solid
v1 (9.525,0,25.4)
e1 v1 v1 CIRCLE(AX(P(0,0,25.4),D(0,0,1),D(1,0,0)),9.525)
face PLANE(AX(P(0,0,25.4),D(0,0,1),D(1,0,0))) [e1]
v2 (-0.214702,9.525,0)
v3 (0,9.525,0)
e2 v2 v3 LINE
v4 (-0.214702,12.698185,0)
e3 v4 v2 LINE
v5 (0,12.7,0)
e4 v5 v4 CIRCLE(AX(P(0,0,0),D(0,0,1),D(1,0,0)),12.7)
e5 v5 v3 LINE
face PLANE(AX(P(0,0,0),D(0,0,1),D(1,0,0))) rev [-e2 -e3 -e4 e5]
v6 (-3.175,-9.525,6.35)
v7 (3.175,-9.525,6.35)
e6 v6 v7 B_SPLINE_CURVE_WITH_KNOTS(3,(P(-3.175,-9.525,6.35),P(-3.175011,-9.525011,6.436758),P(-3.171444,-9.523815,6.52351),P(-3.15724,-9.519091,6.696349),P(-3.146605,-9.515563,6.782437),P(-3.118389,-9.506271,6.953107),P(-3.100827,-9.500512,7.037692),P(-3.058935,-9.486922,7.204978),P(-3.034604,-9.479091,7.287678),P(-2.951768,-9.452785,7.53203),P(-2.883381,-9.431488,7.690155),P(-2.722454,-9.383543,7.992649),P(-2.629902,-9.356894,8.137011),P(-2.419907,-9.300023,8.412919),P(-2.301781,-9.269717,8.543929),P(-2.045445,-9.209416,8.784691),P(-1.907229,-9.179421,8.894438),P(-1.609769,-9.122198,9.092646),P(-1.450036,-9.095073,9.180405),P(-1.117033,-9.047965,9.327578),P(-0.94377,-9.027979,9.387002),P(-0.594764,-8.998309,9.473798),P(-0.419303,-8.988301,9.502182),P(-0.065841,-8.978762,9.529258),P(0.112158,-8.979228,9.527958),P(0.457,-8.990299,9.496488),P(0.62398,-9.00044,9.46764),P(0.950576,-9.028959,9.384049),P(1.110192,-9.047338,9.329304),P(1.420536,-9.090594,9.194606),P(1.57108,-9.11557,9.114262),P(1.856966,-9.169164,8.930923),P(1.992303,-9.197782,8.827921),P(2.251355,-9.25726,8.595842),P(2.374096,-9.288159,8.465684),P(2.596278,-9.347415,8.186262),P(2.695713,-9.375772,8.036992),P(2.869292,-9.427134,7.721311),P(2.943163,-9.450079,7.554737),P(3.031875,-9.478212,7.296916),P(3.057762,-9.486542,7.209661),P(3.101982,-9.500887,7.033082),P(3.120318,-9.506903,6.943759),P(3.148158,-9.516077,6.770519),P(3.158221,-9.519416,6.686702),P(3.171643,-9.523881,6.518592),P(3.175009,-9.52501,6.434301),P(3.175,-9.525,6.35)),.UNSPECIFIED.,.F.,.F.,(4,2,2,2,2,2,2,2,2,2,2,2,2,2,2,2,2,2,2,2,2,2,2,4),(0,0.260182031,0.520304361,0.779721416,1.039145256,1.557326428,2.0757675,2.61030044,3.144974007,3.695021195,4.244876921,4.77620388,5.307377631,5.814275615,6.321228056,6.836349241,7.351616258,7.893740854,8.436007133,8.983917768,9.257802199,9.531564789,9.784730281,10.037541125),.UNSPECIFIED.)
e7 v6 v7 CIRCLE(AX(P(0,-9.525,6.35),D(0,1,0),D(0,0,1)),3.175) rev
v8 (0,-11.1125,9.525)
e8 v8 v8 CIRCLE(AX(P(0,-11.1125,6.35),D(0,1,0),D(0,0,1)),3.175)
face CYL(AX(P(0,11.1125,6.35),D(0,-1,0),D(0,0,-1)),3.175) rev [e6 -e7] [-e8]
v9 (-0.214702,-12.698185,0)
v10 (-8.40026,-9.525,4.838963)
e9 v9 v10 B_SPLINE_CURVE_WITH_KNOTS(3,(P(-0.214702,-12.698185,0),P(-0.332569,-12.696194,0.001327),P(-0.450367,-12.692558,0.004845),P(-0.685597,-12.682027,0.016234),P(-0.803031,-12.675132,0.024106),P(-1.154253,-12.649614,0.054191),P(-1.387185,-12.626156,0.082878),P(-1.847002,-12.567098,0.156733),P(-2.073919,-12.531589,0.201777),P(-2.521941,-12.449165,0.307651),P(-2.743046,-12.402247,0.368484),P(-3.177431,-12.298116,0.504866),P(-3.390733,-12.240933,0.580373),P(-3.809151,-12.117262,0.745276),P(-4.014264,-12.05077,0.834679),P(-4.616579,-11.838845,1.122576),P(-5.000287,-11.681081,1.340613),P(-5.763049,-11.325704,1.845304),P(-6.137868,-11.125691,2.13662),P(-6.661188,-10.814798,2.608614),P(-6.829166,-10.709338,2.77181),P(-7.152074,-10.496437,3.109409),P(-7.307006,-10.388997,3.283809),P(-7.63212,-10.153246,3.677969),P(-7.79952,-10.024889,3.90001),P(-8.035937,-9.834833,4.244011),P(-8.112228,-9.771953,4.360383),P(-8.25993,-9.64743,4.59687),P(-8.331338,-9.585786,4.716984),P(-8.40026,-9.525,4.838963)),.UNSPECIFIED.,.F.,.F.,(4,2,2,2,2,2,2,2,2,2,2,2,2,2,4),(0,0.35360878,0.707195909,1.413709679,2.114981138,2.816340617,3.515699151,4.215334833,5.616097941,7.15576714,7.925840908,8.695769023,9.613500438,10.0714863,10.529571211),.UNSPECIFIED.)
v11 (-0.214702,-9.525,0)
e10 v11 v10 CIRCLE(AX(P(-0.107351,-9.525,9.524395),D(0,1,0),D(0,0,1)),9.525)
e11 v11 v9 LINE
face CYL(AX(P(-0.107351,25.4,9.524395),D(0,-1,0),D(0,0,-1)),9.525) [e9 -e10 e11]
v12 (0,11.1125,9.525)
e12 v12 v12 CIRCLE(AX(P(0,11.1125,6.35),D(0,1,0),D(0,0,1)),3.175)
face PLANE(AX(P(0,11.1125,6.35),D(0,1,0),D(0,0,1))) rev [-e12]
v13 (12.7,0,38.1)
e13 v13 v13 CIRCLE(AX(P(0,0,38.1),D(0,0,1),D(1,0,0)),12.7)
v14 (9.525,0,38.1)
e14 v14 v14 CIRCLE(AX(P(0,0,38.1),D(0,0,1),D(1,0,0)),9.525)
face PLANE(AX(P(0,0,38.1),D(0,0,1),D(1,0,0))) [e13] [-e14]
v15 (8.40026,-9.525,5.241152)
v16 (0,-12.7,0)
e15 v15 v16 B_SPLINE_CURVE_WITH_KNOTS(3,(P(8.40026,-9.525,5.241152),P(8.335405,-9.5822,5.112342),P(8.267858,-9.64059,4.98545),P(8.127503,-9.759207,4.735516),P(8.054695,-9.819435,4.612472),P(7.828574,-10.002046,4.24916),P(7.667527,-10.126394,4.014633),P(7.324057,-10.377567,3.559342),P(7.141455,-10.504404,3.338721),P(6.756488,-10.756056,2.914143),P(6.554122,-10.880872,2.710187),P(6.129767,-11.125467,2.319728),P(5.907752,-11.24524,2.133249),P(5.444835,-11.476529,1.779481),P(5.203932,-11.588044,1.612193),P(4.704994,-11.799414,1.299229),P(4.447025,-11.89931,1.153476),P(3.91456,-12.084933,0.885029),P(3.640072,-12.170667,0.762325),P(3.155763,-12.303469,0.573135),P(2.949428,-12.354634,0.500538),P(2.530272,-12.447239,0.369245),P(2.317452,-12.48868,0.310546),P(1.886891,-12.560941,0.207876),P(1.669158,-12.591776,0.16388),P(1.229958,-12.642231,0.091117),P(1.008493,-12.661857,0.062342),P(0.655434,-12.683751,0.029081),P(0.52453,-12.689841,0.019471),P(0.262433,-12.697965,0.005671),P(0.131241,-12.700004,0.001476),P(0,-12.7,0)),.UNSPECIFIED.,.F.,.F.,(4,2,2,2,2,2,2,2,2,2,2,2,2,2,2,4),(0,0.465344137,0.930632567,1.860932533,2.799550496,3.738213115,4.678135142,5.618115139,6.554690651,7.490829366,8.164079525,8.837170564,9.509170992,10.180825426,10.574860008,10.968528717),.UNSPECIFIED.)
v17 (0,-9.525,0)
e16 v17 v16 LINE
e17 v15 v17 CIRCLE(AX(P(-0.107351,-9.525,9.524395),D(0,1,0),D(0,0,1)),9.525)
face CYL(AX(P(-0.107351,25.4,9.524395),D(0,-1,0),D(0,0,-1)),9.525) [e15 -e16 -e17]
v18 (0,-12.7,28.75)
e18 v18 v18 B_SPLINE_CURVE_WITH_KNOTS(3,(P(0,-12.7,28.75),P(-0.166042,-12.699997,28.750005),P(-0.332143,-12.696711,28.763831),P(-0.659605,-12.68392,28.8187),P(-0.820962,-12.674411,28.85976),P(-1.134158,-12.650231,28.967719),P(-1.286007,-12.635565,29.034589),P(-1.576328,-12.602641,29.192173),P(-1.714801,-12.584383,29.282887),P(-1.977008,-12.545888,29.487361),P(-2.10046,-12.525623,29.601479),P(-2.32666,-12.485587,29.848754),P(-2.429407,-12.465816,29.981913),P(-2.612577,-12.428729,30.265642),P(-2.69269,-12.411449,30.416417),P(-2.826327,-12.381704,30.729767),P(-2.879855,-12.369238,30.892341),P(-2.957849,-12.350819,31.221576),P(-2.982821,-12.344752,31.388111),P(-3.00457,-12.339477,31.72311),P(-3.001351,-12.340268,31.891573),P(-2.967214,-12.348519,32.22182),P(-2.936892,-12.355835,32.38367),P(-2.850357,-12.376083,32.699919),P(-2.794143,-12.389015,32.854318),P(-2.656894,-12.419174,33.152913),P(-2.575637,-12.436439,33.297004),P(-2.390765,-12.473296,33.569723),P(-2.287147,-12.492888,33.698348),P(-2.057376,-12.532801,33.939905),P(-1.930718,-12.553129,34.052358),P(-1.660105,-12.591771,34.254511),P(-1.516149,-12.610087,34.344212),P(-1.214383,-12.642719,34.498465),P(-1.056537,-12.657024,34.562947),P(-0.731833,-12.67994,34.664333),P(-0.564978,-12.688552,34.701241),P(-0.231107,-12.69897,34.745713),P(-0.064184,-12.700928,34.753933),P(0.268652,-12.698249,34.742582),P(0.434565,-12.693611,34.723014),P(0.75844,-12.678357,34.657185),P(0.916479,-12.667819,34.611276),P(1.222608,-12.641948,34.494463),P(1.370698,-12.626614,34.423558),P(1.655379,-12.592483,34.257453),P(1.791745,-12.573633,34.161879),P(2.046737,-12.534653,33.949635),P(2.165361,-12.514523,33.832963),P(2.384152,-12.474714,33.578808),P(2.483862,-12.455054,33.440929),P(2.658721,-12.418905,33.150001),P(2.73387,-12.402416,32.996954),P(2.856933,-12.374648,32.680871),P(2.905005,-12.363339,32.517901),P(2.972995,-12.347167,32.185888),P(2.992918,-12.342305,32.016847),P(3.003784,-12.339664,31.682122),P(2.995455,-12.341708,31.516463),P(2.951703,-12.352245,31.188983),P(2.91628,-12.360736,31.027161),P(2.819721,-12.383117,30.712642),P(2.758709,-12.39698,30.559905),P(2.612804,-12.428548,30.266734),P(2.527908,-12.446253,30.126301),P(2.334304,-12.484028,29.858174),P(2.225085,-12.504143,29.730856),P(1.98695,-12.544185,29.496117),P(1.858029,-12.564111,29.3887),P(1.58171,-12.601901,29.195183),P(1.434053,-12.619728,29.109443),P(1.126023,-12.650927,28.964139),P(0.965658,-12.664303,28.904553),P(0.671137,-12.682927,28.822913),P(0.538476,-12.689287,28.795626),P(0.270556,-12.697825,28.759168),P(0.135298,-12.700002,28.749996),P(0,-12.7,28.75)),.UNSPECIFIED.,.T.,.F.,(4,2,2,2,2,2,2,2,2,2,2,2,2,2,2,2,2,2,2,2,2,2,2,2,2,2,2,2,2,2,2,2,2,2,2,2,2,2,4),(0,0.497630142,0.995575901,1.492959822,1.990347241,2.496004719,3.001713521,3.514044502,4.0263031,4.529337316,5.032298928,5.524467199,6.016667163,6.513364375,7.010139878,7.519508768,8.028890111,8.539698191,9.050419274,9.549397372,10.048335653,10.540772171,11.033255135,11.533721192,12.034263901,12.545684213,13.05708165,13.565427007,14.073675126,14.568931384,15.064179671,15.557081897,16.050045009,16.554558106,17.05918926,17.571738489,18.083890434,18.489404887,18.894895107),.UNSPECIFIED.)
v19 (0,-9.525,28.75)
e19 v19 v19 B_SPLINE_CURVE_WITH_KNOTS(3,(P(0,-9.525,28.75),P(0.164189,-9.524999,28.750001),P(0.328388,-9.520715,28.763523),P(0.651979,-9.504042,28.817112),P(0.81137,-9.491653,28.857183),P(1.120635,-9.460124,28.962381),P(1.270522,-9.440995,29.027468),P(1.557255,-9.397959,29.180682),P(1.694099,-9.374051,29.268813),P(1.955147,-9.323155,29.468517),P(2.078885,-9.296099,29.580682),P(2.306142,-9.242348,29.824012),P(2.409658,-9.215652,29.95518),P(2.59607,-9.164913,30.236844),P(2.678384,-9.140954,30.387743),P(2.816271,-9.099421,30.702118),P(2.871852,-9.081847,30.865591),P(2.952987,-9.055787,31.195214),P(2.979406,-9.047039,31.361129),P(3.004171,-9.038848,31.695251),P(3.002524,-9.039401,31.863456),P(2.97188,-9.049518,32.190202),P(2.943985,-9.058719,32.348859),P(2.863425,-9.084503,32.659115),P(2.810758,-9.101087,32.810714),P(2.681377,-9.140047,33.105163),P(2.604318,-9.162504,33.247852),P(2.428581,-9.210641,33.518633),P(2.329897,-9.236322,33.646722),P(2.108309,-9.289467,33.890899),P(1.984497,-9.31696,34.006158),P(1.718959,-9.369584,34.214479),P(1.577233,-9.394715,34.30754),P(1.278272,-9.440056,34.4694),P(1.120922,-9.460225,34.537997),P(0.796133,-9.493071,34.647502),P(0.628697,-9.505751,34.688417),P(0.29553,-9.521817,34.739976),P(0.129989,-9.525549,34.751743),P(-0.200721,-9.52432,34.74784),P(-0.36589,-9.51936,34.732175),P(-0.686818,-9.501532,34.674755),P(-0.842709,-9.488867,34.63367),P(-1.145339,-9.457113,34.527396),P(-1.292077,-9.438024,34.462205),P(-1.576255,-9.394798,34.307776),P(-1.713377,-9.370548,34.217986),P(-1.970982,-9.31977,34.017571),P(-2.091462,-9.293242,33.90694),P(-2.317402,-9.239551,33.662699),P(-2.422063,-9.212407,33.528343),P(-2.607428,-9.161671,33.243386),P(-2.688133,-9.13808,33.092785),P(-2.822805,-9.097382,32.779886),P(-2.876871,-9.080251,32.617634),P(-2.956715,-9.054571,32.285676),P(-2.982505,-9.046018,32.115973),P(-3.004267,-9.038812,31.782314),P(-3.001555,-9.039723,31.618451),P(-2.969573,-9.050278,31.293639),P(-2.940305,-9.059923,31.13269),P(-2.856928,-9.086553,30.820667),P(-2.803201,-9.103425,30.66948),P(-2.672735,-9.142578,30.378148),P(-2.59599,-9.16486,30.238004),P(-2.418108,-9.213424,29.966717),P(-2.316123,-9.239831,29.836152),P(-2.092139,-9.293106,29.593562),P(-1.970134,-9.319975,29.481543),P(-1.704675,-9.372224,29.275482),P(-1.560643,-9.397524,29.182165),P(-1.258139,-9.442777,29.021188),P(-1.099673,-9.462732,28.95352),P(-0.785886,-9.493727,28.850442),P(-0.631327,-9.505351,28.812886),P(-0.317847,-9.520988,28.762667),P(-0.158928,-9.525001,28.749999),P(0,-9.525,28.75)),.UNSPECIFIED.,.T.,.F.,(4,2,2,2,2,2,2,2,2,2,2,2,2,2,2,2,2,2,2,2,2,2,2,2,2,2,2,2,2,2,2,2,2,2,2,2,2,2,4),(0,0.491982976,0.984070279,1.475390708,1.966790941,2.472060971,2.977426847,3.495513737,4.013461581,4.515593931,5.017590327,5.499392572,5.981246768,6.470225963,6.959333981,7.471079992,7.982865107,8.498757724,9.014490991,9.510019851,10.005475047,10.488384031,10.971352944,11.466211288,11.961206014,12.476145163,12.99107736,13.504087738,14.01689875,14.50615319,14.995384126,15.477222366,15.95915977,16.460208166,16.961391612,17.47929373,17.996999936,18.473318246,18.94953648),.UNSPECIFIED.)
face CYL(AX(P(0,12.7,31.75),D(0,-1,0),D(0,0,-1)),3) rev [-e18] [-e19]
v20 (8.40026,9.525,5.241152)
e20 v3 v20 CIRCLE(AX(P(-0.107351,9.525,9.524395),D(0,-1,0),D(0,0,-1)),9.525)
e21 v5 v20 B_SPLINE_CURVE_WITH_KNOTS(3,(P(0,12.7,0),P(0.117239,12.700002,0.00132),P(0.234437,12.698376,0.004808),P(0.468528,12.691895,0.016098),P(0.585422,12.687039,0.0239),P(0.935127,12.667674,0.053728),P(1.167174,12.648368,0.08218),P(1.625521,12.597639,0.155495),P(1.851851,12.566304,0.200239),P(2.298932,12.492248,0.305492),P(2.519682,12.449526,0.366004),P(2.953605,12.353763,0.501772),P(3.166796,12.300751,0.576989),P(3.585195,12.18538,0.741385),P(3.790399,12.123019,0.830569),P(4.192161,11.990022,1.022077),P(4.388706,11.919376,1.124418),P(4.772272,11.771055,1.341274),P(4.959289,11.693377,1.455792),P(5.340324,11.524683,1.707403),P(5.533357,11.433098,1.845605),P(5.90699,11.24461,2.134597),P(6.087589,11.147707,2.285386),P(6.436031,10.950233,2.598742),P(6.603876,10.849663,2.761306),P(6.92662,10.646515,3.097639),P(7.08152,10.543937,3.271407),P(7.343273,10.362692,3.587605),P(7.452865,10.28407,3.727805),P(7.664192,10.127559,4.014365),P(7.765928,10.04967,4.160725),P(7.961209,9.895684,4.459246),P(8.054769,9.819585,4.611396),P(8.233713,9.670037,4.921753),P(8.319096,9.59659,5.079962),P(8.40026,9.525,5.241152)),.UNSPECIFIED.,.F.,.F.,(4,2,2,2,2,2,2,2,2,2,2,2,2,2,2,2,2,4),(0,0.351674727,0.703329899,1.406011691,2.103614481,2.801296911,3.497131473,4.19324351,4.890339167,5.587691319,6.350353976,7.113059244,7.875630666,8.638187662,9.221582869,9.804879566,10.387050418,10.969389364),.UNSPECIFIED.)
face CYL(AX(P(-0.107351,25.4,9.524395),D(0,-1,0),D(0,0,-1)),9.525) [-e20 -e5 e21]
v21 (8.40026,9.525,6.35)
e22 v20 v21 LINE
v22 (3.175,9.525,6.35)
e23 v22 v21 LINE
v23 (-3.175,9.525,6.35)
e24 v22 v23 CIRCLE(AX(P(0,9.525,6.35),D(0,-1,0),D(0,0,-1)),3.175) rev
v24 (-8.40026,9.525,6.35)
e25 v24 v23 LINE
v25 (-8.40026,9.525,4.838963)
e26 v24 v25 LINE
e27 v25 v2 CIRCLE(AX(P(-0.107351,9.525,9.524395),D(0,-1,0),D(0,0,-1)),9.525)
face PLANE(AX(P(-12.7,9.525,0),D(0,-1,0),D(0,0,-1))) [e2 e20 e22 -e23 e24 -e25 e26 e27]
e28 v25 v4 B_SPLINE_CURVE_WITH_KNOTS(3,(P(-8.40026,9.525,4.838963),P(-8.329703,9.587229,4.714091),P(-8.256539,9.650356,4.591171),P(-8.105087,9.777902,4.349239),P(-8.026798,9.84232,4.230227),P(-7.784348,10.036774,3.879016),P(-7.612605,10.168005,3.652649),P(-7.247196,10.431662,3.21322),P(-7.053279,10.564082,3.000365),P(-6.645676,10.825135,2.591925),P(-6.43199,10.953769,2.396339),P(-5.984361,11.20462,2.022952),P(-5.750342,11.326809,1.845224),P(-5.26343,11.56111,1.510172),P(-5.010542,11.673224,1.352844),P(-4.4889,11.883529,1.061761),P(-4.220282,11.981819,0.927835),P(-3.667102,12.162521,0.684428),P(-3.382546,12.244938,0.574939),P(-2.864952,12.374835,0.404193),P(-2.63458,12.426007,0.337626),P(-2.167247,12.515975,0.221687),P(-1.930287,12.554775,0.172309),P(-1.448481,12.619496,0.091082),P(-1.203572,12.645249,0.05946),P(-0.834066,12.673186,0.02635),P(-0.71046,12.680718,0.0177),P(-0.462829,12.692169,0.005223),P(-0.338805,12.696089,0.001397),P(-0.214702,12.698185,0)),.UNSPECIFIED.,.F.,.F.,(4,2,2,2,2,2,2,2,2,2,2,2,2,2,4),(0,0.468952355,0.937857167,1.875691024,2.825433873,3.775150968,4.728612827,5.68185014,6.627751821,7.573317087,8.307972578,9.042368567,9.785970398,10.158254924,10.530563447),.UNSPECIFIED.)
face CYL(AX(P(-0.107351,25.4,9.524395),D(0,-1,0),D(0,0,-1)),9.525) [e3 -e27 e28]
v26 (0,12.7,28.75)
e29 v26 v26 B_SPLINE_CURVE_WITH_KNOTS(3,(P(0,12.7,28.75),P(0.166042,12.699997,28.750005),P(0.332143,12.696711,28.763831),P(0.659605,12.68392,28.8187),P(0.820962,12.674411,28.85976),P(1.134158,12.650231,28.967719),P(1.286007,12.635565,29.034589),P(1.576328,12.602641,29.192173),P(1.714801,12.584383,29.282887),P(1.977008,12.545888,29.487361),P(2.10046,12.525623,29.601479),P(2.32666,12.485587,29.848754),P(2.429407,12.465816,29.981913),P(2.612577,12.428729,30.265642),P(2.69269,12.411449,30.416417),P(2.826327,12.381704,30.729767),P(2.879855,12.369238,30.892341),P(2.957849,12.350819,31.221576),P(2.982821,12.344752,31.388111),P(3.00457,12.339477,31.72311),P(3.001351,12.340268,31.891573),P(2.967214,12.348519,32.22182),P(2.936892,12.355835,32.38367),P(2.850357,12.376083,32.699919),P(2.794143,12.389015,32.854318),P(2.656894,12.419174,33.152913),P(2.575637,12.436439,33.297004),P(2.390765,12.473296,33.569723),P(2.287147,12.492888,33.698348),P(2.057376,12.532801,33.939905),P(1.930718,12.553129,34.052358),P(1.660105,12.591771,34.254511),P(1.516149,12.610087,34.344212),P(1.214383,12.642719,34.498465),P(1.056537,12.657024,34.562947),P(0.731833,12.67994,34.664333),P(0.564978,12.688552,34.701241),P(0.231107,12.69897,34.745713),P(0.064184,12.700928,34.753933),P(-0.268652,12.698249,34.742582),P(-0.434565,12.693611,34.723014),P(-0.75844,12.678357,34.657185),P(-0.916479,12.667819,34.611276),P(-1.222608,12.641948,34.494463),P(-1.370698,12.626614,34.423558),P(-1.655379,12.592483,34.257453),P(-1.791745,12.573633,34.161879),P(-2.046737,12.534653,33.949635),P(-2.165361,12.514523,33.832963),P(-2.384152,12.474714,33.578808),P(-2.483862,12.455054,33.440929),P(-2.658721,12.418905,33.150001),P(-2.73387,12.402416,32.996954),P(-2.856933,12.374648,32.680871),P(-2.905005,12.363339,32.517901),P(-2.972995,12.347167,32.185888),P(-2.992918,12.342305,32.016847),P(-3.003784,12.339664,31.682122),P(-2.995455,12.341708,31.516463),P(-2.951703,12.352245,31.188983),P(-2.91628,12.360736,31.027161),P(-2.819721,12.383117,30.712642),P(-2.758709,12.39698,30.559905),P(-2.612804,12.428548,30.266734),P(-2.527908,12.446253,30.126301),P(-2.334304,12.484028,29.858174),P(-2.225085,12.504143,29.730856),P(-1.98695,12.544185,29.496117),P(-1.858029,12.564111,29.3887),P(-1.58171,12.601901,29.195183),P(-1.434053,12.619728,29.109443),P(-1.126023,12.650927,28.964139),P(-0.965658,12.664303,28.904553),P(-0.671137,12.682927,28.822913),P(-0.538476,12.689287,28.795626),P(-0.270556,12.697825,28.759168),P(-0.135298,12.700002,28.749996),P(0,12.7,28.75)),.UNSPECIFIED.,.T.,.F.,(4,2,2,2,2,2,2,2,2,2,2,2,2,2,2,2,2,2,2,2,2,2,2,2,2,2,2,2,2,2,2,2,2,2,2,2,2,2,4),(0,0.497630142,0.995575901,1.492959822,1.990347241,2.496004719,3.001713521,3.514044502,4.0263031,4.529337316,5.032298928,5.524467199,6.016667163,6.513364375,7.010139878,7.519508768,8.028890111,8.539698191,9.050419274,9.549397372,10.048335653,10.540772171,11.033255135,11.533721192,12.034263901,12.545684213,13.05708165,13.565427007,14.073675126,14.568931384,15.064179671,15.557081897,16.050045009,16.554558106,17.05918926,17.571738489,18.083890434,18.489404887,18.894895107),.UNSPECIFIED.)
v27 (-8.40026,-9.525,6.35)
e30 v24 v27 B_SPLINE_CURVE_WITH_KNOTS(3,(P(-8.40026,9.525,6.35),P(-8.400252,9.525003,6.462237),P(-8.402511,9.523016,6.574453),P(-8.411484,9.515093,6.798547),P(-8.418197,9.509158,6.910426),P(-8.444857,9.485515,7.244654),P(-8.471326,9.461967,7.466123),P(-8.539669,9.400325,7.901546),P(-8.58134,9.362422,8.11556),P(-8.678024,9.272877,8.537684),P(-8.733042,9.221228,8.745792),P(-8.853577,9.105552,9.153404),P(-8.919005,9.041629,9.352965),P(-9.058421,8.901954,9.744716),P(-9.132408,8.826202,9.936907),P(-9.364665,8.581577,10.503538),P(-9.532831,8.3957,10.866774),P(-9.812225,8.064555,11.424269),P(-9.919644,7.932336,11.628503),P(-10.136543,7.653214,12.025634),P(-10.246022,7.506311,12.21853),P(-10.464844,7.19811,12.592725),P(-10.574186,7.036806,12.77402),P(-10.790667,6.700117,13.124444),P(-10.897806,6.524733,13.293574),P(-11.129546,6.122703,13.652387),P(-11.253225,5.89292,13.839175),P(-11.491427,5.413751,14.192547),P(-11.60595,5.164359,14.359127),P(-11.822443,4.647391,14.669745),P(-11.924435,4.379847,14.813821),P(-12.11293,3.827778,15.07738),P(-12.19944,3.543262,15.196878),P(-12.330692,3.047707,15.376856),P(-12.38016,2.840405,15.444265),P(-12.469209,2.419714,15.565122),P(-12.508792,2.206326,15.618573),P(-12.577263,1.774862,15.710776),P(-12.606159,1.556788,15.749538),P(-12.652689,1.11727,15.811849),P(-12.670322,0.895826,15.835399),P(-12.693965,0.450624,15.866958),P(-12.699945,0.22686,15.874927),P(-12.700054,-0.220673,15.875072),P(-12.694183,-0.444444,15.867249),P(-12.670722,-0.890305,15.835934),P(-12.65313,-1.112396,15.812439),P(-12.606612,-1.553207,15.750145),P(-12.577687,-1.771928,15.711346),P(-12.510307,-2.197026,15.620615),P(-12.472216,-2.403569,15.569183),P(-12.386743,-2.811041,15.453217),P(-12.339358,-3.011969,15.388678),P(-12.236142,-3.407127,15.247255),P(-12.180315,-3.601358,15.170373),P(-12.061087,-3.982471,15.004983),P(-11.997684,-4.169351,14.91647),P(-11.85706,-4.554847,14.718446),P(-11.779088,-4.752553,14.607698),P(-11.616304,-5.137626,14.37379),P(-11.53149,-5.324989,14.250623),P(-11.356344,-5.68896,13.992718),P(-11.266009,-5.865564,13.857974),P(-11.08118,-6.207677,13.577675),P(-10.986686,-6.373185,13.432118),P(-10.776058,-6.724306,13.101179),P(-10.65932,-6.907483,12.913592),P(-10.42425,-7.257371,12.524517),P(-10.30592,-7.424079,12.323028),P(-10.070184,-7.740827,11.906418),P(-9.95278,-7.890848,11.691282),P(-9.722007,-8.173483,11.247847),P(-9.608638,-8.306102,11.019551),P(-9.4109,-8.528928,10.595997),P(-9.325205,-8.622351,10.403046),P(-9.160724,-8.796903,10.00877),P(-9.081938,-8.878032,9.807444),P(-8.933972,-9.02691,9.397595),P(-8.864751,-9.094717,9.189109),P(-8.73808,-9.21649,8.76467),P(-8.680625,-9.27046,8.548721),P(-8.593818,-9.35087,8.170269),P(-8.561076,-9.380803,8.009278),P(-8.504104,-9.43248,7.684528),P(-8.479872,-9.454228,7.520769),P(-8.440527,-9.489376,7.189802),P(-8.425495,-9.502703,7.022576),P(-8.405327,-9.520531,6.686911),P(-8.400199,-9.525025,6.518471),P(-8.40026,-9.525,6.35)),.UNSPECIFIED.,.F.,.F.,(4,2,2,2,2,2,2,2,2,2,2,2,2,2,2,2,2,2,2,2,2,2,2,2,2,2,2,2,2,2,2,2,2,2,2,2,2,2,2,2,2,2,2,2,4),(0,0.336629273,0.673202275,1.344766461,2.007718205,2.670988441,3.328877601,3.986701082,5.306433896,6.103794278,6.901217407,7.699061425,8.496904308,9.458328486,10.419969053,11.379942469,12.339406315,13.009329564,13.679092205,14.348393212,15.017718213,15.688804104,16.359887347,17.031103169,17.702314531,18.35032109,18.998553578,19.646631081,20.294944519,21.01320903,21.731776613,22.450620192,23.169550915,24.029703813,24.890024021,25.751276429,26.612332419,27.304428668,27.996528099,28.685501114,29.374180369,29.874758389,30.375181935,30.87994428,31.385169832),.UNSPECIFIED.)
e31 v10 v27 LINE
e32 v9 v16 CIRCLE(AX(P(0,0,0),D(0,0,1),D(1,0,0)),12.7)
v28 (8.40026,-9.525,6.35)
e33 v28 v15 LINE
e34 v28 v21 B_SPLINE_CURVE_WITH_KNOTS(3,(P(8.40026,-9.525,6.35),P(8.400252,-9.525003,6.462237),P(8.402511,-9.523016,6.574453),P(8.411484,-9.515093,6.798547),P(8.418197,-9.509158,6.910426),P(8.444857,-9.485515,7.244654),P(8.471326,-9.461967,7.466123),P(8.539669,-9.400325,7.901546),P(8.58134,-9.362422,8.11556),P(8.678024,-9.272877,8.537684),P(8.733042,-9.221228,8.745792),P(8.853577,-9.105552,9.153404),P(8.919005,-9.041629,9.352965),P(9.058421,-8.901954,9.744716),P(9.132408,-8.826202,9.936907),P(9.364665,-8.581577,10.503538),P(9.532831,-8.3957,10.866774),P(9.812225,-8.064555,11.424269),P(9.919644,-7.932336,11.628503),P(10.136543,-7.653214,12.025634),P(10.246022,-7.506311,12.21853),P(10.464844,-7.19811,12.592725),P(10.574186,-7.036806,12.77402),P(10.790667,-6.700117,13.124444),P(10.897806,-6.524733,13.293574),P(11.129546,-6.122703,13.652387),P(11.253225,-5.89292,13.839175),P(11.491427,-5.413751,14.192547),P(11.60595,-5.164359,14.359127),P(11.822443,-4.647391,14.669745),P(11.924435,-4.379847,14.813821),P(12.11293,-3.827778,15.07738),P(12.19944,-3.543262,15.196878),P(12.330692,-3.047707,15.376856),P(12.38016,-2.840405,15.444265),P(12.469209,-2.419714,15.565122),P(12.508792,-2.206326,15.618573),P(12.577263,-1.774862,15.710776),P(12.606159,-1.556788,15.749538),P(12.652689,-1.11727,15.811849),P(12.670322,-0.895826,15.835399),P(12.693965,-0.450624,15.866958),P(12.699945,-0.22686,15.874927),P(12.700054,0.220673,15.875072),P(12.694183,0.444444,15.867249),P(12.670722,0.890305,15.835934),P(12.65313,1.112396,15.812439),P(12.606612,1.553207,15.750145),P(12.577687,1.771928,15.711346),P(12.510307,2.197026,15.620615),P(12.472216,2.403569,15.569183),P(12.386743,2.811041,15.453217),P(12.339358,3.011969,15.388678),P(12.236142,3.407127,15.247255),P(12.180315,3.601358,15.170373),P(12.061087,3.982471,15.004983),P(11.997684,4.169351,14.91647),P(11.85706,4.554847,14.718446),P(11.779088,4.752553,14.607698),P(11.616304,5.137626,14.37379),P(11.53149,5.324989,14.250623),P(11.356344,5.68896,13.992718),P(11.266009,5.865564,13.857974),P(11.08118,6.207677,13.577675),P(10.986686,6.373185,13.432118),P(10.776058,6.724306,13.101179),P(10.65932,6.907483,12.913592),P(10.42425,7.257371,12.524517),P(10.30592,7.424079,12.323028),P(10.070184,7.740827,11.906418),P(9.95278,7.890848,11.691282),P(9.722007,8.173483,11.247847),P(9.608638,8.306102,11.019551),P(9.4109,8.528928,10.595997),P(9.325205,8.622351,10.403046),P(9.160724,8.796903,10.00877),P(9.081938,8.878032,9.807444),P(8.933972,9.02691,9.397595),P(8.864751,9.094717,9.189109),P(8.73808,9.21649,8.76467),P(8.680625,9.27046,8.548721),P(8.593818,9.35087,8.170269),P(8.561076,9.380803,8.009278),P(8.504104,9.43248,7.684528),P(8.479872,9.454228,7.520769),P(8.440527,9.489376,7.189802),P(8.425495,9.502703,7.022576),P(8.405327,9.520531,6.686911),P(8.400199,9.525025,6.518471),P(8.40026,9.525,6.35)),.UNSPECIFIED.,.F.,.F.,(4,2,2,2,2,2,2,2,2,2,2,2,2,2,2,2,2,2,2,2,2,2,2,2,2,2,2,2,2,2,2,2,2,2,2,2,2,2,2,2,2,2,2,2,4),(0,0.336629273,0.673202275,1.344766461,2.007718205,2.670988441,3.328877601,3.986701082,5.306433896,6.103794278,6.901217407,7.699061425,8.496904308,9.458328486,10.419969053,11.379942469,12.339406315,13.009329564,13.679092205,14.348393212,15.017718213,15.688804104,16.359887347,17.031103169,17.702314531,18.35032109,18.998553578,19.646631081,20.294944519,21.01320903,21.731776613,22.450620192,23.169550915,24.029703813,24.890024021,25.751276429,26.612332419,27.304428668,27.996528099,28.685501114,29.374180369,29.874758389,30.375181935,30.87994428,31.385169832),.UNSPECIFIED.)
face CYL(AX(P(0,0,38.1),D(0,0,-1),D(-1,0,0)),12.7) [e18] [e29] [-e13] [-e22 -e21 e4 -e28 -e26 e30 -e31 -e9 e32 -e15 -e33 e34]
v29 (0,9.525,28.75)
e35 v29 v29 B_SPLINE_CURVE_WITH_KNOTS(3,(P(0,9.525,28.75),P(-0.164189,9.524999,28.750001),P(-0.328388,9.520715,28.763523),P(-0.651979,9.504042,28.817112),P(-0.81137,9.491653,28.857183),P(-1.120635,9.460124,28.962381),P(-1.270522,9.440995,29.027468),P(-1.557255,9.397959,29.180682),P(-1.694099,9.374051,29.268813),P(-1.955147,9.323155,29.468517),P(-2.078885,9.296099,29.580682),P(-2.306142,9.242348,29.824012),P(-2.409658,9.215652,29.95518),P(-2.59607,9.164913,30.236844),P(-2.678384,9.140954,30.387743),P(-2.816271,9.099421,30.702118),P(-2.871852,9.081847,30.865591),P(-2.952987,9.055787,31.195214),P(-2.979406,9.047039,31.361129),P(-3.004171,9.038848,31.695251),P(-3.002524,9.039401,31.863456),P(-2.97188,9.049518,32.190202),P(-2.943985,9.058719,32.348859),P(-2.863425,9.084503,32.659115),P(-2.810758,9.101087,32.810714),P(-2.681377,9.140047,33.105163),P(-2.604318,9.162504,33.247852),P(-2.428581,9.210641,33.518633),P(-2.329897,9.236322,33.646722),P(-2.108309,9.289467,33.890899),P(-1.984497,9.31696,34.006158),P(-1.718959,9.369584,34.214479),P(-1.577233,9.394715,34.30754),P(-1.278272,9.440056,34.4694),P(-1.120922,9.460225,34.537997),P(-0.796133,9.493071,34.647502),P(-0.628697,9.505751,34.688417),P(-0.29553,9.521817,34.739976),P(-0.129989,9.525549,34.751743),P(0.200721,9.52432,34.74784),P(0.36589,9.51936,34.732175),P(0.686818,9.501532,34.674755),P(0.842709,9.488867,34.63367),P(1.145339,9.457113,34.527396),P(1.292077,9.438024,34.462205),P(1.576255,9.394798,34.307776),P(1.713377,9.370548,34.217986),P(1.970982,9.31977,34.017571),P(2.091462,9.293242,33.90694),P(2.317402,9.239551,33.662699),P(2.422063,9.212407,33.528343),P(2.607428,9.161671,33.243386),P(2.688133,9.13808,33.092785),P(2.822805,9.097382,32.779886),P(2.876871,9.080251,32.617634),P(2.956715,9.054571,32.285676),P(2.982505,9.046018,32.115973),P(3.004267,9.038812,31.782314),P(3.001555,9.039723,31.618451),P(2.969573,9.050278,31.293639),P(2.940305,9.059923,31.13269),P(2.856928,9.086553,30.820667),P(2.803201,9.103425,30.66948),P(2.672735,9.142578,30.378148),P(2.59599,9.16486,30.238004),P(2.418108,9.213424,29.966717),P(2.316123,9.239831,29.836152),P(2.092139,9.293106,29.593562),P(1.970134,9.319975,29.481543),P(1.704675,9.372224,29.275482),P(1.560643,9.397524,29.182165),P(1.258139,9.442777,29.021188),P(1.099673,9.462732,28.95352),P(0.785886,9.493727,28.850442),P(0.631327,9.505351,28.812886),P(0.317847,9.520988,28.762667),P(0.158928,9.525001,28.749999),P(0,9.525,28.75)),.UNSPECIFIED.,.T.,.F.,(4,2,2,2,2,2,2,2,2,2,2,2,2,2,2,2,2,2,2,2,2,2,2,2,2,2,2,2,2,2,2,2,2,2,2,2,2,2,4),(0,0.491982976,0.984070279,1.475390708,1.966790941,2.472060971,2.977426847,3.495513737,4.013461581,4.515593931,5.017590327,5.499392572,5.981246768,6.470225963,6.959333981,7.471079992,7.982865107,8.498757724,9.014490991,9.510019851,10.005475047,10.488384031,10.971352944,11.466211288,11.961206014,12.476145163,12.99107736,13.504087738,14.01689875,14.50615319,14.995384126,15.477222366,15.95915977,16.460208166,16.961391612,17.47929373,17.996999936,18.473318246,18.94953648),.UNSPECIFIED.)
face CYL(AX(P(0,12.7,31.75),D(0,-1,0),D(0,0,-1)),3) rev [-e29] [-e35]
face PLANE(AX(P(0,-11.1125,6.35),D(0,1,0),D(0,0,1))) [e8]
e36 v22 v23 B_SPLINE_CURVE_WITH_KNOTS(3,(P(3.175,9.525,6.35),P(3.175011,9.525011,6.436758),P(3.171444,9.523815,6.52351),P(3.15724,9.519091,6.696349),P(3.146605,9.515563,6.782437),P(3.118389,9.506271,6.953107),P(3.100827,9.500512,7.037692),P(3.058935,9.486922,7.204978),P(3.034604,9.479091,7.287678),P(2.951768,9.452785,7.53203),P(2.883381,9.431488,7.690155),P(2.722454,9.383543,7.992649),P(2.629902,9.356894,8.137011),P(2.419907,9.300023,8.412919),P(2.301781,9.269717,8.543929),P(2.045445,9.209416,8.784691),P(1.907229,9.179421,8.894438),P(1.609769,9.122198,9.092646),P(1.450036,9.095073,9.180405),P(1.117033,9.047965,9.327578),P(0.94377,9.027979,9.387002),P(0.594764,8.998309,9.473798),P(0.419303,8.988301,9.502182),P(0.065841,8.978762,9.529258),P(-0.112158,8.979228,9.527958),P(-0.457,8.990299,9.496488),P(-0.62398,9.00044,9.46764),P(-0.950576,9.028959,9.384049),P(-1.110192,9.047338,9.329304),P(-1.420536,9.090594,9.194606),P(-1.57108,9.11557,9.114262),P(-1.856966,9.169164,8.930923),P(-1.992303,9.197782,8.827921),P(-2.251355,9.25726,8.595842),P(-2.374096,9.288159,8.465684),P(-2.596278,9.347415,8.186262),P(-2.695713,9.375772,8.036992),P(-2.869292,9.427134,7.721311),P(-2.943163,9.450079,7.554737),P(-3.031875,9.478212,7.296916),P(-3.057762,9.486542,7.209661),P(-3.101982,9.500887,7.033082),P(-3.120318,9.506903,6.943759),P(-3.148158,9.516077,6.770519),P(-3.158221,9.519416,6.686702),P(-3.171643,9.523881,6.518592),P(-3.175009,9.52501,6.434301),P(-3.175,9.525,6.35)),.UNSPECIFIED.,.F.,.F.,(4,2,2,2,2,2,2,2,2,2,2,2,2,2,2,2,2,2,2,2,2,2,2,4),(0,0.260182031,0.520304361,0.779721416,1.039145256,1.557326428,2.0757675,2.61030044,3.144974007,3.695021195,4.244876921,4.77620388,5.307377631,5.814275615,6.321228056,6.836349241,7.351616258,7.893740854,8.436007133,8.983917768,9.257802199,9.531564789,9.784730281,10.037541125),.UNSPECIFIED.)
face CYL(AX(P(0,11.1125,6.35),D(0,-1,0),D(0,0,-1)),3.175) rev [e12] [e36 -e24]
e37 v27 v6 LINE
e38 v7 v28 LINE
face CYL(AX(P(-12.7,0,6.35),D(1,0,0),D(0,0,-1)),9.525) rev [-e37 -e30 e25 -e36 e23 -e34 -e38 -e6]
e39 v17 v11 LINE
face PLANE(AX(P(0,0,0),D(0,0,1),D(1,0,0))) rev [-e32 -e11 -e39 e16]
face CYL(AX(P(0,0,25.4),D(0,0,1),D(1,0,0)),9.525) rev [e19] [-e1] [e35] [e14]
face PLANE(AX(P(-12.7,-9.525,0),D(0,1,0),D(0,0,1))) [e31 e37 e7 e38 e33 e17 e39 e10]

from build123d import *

# Parameters (mm, degrees)
SKETCH1_R               = 12.7
BOSS_EXTRUDE1_DEPTH     = 38.1
CUT_EXTRUDE2_DEPTH      = 48.519048812
CUT_EXTRUDE3_DEPTH      = 38.1
SKETCH4_R               = 9.525
CUT_EXTRUDE4_DEPTH      = 12.7
CUT_EXTRUDE5_DEPTH      = 11.1125
CUT_EXTRUDE5_DEPTH_BACK = 11.1125
SKETCH6_R               = 3.175
SKETCH7_R               = 3
CUT_EXTRUDE6_DEPTH      = 48.519048972


with BuildPart() as part:
    # Sketch1 → Boss-Extrude1 (new body)
    with BuildSketch(Plane.XY):
        Circle(SKETCH1_R)
    extrude(amount=BOSS_EXTRUDE1_DEPTH)

    # Sketch2 → Cut-Extrude2 (cut, through all)
    with BuildSketch(Plane(origin=(12.7, 0, 0), x_dir=(0, 0, -1), z_dir=(1, 0, 0))):
        with BuildLine():
            Line((3.175, 9.525), (-6.35, 9.525))
            ThreePointArc((-6.35, 9.525), (-15.875, 0), (-6.35, -9.525))
            Line((-6.35, -9.525), (3.175, -9.525))
            Line((3.175, -9.525), (3.175, 9.525))
        make_face()
    extrude(amount=-CUT_EXTRUDE2_DEPTH, mode=Mode.SUBTRACT)

    # Sketch3 → Cut-Extrude3 (cut)
    with BuildSketch(Plane(origin=(0, -12.7, 0), x_dir=(-1, 0, 0), z_dir=(0, -1, 0))):
        with BuildLine():
            ThreePointArc((-8.400260413, -5.241151589), (-4.934653756, -1.443317517), (0, 0))
            Line((0, 0), (-8.400260413, 0))
            Line((-8.400260413, 0), (-8.400260413, -5.241151589))
        make_face()
        with BuildLine():
            Line((8.400260413, 0), (0.21470184, 0))
            ThreePointArc((0.21470184, 0), (4.954513337, -1.324965695), (8.400260413, -4.838962595))
            Line((8.400260413, -4.838962595), (8.400260413, 0))
        make_face()
    extrude(amount=-CUT_EXTRUDE3_DEPTH, mode=Mode.SUBTRACT)

    # Sketch4 → Cut-Extrude4 (cut)
    with BuildSketch(Plane.XY.offset(38.1)):
        Circle(SKETCH4_R)
    extrude(amount=-CUT_EXTRUDE4_DEPTH, mode=Mode.SUBTRACT)

    # Sketch6 → Cut-Extrude5 (cut, two sides: drawn at the far end of the back side and taken through both)
    with BuildSketch(Plane(origin=(0, 0, 0), x_dir=(1, 0, 0), z_dir=(0, 1, 0)).offset(-CUT_EXTRUDE5_DEPTH_BACK)):
        with Locations((0, -6.35)):
            Circle(SKETCH6_R)
    extrude(amount=CUT_EXTRUDE5_DEPTH + CUT_EXTRUDE5_DEPTH_BACK, mode=Mode.SUBTRACT)

    # Sketch7 → Cut-Extrude6 (cut, through all)
    with BuildSketch(Plane(origin=(0, -12.7, 0), x_dir=(-1, 0, 0), z_dir=(0, -1, 0))):
        with Locations((0, -31.75)):
            Circle(SKETCH7_R)
    extrude(amount=-CUT_EXTRUDE6_DEPTH, mode=Mode.SUBTRACT)


solid = part.part
